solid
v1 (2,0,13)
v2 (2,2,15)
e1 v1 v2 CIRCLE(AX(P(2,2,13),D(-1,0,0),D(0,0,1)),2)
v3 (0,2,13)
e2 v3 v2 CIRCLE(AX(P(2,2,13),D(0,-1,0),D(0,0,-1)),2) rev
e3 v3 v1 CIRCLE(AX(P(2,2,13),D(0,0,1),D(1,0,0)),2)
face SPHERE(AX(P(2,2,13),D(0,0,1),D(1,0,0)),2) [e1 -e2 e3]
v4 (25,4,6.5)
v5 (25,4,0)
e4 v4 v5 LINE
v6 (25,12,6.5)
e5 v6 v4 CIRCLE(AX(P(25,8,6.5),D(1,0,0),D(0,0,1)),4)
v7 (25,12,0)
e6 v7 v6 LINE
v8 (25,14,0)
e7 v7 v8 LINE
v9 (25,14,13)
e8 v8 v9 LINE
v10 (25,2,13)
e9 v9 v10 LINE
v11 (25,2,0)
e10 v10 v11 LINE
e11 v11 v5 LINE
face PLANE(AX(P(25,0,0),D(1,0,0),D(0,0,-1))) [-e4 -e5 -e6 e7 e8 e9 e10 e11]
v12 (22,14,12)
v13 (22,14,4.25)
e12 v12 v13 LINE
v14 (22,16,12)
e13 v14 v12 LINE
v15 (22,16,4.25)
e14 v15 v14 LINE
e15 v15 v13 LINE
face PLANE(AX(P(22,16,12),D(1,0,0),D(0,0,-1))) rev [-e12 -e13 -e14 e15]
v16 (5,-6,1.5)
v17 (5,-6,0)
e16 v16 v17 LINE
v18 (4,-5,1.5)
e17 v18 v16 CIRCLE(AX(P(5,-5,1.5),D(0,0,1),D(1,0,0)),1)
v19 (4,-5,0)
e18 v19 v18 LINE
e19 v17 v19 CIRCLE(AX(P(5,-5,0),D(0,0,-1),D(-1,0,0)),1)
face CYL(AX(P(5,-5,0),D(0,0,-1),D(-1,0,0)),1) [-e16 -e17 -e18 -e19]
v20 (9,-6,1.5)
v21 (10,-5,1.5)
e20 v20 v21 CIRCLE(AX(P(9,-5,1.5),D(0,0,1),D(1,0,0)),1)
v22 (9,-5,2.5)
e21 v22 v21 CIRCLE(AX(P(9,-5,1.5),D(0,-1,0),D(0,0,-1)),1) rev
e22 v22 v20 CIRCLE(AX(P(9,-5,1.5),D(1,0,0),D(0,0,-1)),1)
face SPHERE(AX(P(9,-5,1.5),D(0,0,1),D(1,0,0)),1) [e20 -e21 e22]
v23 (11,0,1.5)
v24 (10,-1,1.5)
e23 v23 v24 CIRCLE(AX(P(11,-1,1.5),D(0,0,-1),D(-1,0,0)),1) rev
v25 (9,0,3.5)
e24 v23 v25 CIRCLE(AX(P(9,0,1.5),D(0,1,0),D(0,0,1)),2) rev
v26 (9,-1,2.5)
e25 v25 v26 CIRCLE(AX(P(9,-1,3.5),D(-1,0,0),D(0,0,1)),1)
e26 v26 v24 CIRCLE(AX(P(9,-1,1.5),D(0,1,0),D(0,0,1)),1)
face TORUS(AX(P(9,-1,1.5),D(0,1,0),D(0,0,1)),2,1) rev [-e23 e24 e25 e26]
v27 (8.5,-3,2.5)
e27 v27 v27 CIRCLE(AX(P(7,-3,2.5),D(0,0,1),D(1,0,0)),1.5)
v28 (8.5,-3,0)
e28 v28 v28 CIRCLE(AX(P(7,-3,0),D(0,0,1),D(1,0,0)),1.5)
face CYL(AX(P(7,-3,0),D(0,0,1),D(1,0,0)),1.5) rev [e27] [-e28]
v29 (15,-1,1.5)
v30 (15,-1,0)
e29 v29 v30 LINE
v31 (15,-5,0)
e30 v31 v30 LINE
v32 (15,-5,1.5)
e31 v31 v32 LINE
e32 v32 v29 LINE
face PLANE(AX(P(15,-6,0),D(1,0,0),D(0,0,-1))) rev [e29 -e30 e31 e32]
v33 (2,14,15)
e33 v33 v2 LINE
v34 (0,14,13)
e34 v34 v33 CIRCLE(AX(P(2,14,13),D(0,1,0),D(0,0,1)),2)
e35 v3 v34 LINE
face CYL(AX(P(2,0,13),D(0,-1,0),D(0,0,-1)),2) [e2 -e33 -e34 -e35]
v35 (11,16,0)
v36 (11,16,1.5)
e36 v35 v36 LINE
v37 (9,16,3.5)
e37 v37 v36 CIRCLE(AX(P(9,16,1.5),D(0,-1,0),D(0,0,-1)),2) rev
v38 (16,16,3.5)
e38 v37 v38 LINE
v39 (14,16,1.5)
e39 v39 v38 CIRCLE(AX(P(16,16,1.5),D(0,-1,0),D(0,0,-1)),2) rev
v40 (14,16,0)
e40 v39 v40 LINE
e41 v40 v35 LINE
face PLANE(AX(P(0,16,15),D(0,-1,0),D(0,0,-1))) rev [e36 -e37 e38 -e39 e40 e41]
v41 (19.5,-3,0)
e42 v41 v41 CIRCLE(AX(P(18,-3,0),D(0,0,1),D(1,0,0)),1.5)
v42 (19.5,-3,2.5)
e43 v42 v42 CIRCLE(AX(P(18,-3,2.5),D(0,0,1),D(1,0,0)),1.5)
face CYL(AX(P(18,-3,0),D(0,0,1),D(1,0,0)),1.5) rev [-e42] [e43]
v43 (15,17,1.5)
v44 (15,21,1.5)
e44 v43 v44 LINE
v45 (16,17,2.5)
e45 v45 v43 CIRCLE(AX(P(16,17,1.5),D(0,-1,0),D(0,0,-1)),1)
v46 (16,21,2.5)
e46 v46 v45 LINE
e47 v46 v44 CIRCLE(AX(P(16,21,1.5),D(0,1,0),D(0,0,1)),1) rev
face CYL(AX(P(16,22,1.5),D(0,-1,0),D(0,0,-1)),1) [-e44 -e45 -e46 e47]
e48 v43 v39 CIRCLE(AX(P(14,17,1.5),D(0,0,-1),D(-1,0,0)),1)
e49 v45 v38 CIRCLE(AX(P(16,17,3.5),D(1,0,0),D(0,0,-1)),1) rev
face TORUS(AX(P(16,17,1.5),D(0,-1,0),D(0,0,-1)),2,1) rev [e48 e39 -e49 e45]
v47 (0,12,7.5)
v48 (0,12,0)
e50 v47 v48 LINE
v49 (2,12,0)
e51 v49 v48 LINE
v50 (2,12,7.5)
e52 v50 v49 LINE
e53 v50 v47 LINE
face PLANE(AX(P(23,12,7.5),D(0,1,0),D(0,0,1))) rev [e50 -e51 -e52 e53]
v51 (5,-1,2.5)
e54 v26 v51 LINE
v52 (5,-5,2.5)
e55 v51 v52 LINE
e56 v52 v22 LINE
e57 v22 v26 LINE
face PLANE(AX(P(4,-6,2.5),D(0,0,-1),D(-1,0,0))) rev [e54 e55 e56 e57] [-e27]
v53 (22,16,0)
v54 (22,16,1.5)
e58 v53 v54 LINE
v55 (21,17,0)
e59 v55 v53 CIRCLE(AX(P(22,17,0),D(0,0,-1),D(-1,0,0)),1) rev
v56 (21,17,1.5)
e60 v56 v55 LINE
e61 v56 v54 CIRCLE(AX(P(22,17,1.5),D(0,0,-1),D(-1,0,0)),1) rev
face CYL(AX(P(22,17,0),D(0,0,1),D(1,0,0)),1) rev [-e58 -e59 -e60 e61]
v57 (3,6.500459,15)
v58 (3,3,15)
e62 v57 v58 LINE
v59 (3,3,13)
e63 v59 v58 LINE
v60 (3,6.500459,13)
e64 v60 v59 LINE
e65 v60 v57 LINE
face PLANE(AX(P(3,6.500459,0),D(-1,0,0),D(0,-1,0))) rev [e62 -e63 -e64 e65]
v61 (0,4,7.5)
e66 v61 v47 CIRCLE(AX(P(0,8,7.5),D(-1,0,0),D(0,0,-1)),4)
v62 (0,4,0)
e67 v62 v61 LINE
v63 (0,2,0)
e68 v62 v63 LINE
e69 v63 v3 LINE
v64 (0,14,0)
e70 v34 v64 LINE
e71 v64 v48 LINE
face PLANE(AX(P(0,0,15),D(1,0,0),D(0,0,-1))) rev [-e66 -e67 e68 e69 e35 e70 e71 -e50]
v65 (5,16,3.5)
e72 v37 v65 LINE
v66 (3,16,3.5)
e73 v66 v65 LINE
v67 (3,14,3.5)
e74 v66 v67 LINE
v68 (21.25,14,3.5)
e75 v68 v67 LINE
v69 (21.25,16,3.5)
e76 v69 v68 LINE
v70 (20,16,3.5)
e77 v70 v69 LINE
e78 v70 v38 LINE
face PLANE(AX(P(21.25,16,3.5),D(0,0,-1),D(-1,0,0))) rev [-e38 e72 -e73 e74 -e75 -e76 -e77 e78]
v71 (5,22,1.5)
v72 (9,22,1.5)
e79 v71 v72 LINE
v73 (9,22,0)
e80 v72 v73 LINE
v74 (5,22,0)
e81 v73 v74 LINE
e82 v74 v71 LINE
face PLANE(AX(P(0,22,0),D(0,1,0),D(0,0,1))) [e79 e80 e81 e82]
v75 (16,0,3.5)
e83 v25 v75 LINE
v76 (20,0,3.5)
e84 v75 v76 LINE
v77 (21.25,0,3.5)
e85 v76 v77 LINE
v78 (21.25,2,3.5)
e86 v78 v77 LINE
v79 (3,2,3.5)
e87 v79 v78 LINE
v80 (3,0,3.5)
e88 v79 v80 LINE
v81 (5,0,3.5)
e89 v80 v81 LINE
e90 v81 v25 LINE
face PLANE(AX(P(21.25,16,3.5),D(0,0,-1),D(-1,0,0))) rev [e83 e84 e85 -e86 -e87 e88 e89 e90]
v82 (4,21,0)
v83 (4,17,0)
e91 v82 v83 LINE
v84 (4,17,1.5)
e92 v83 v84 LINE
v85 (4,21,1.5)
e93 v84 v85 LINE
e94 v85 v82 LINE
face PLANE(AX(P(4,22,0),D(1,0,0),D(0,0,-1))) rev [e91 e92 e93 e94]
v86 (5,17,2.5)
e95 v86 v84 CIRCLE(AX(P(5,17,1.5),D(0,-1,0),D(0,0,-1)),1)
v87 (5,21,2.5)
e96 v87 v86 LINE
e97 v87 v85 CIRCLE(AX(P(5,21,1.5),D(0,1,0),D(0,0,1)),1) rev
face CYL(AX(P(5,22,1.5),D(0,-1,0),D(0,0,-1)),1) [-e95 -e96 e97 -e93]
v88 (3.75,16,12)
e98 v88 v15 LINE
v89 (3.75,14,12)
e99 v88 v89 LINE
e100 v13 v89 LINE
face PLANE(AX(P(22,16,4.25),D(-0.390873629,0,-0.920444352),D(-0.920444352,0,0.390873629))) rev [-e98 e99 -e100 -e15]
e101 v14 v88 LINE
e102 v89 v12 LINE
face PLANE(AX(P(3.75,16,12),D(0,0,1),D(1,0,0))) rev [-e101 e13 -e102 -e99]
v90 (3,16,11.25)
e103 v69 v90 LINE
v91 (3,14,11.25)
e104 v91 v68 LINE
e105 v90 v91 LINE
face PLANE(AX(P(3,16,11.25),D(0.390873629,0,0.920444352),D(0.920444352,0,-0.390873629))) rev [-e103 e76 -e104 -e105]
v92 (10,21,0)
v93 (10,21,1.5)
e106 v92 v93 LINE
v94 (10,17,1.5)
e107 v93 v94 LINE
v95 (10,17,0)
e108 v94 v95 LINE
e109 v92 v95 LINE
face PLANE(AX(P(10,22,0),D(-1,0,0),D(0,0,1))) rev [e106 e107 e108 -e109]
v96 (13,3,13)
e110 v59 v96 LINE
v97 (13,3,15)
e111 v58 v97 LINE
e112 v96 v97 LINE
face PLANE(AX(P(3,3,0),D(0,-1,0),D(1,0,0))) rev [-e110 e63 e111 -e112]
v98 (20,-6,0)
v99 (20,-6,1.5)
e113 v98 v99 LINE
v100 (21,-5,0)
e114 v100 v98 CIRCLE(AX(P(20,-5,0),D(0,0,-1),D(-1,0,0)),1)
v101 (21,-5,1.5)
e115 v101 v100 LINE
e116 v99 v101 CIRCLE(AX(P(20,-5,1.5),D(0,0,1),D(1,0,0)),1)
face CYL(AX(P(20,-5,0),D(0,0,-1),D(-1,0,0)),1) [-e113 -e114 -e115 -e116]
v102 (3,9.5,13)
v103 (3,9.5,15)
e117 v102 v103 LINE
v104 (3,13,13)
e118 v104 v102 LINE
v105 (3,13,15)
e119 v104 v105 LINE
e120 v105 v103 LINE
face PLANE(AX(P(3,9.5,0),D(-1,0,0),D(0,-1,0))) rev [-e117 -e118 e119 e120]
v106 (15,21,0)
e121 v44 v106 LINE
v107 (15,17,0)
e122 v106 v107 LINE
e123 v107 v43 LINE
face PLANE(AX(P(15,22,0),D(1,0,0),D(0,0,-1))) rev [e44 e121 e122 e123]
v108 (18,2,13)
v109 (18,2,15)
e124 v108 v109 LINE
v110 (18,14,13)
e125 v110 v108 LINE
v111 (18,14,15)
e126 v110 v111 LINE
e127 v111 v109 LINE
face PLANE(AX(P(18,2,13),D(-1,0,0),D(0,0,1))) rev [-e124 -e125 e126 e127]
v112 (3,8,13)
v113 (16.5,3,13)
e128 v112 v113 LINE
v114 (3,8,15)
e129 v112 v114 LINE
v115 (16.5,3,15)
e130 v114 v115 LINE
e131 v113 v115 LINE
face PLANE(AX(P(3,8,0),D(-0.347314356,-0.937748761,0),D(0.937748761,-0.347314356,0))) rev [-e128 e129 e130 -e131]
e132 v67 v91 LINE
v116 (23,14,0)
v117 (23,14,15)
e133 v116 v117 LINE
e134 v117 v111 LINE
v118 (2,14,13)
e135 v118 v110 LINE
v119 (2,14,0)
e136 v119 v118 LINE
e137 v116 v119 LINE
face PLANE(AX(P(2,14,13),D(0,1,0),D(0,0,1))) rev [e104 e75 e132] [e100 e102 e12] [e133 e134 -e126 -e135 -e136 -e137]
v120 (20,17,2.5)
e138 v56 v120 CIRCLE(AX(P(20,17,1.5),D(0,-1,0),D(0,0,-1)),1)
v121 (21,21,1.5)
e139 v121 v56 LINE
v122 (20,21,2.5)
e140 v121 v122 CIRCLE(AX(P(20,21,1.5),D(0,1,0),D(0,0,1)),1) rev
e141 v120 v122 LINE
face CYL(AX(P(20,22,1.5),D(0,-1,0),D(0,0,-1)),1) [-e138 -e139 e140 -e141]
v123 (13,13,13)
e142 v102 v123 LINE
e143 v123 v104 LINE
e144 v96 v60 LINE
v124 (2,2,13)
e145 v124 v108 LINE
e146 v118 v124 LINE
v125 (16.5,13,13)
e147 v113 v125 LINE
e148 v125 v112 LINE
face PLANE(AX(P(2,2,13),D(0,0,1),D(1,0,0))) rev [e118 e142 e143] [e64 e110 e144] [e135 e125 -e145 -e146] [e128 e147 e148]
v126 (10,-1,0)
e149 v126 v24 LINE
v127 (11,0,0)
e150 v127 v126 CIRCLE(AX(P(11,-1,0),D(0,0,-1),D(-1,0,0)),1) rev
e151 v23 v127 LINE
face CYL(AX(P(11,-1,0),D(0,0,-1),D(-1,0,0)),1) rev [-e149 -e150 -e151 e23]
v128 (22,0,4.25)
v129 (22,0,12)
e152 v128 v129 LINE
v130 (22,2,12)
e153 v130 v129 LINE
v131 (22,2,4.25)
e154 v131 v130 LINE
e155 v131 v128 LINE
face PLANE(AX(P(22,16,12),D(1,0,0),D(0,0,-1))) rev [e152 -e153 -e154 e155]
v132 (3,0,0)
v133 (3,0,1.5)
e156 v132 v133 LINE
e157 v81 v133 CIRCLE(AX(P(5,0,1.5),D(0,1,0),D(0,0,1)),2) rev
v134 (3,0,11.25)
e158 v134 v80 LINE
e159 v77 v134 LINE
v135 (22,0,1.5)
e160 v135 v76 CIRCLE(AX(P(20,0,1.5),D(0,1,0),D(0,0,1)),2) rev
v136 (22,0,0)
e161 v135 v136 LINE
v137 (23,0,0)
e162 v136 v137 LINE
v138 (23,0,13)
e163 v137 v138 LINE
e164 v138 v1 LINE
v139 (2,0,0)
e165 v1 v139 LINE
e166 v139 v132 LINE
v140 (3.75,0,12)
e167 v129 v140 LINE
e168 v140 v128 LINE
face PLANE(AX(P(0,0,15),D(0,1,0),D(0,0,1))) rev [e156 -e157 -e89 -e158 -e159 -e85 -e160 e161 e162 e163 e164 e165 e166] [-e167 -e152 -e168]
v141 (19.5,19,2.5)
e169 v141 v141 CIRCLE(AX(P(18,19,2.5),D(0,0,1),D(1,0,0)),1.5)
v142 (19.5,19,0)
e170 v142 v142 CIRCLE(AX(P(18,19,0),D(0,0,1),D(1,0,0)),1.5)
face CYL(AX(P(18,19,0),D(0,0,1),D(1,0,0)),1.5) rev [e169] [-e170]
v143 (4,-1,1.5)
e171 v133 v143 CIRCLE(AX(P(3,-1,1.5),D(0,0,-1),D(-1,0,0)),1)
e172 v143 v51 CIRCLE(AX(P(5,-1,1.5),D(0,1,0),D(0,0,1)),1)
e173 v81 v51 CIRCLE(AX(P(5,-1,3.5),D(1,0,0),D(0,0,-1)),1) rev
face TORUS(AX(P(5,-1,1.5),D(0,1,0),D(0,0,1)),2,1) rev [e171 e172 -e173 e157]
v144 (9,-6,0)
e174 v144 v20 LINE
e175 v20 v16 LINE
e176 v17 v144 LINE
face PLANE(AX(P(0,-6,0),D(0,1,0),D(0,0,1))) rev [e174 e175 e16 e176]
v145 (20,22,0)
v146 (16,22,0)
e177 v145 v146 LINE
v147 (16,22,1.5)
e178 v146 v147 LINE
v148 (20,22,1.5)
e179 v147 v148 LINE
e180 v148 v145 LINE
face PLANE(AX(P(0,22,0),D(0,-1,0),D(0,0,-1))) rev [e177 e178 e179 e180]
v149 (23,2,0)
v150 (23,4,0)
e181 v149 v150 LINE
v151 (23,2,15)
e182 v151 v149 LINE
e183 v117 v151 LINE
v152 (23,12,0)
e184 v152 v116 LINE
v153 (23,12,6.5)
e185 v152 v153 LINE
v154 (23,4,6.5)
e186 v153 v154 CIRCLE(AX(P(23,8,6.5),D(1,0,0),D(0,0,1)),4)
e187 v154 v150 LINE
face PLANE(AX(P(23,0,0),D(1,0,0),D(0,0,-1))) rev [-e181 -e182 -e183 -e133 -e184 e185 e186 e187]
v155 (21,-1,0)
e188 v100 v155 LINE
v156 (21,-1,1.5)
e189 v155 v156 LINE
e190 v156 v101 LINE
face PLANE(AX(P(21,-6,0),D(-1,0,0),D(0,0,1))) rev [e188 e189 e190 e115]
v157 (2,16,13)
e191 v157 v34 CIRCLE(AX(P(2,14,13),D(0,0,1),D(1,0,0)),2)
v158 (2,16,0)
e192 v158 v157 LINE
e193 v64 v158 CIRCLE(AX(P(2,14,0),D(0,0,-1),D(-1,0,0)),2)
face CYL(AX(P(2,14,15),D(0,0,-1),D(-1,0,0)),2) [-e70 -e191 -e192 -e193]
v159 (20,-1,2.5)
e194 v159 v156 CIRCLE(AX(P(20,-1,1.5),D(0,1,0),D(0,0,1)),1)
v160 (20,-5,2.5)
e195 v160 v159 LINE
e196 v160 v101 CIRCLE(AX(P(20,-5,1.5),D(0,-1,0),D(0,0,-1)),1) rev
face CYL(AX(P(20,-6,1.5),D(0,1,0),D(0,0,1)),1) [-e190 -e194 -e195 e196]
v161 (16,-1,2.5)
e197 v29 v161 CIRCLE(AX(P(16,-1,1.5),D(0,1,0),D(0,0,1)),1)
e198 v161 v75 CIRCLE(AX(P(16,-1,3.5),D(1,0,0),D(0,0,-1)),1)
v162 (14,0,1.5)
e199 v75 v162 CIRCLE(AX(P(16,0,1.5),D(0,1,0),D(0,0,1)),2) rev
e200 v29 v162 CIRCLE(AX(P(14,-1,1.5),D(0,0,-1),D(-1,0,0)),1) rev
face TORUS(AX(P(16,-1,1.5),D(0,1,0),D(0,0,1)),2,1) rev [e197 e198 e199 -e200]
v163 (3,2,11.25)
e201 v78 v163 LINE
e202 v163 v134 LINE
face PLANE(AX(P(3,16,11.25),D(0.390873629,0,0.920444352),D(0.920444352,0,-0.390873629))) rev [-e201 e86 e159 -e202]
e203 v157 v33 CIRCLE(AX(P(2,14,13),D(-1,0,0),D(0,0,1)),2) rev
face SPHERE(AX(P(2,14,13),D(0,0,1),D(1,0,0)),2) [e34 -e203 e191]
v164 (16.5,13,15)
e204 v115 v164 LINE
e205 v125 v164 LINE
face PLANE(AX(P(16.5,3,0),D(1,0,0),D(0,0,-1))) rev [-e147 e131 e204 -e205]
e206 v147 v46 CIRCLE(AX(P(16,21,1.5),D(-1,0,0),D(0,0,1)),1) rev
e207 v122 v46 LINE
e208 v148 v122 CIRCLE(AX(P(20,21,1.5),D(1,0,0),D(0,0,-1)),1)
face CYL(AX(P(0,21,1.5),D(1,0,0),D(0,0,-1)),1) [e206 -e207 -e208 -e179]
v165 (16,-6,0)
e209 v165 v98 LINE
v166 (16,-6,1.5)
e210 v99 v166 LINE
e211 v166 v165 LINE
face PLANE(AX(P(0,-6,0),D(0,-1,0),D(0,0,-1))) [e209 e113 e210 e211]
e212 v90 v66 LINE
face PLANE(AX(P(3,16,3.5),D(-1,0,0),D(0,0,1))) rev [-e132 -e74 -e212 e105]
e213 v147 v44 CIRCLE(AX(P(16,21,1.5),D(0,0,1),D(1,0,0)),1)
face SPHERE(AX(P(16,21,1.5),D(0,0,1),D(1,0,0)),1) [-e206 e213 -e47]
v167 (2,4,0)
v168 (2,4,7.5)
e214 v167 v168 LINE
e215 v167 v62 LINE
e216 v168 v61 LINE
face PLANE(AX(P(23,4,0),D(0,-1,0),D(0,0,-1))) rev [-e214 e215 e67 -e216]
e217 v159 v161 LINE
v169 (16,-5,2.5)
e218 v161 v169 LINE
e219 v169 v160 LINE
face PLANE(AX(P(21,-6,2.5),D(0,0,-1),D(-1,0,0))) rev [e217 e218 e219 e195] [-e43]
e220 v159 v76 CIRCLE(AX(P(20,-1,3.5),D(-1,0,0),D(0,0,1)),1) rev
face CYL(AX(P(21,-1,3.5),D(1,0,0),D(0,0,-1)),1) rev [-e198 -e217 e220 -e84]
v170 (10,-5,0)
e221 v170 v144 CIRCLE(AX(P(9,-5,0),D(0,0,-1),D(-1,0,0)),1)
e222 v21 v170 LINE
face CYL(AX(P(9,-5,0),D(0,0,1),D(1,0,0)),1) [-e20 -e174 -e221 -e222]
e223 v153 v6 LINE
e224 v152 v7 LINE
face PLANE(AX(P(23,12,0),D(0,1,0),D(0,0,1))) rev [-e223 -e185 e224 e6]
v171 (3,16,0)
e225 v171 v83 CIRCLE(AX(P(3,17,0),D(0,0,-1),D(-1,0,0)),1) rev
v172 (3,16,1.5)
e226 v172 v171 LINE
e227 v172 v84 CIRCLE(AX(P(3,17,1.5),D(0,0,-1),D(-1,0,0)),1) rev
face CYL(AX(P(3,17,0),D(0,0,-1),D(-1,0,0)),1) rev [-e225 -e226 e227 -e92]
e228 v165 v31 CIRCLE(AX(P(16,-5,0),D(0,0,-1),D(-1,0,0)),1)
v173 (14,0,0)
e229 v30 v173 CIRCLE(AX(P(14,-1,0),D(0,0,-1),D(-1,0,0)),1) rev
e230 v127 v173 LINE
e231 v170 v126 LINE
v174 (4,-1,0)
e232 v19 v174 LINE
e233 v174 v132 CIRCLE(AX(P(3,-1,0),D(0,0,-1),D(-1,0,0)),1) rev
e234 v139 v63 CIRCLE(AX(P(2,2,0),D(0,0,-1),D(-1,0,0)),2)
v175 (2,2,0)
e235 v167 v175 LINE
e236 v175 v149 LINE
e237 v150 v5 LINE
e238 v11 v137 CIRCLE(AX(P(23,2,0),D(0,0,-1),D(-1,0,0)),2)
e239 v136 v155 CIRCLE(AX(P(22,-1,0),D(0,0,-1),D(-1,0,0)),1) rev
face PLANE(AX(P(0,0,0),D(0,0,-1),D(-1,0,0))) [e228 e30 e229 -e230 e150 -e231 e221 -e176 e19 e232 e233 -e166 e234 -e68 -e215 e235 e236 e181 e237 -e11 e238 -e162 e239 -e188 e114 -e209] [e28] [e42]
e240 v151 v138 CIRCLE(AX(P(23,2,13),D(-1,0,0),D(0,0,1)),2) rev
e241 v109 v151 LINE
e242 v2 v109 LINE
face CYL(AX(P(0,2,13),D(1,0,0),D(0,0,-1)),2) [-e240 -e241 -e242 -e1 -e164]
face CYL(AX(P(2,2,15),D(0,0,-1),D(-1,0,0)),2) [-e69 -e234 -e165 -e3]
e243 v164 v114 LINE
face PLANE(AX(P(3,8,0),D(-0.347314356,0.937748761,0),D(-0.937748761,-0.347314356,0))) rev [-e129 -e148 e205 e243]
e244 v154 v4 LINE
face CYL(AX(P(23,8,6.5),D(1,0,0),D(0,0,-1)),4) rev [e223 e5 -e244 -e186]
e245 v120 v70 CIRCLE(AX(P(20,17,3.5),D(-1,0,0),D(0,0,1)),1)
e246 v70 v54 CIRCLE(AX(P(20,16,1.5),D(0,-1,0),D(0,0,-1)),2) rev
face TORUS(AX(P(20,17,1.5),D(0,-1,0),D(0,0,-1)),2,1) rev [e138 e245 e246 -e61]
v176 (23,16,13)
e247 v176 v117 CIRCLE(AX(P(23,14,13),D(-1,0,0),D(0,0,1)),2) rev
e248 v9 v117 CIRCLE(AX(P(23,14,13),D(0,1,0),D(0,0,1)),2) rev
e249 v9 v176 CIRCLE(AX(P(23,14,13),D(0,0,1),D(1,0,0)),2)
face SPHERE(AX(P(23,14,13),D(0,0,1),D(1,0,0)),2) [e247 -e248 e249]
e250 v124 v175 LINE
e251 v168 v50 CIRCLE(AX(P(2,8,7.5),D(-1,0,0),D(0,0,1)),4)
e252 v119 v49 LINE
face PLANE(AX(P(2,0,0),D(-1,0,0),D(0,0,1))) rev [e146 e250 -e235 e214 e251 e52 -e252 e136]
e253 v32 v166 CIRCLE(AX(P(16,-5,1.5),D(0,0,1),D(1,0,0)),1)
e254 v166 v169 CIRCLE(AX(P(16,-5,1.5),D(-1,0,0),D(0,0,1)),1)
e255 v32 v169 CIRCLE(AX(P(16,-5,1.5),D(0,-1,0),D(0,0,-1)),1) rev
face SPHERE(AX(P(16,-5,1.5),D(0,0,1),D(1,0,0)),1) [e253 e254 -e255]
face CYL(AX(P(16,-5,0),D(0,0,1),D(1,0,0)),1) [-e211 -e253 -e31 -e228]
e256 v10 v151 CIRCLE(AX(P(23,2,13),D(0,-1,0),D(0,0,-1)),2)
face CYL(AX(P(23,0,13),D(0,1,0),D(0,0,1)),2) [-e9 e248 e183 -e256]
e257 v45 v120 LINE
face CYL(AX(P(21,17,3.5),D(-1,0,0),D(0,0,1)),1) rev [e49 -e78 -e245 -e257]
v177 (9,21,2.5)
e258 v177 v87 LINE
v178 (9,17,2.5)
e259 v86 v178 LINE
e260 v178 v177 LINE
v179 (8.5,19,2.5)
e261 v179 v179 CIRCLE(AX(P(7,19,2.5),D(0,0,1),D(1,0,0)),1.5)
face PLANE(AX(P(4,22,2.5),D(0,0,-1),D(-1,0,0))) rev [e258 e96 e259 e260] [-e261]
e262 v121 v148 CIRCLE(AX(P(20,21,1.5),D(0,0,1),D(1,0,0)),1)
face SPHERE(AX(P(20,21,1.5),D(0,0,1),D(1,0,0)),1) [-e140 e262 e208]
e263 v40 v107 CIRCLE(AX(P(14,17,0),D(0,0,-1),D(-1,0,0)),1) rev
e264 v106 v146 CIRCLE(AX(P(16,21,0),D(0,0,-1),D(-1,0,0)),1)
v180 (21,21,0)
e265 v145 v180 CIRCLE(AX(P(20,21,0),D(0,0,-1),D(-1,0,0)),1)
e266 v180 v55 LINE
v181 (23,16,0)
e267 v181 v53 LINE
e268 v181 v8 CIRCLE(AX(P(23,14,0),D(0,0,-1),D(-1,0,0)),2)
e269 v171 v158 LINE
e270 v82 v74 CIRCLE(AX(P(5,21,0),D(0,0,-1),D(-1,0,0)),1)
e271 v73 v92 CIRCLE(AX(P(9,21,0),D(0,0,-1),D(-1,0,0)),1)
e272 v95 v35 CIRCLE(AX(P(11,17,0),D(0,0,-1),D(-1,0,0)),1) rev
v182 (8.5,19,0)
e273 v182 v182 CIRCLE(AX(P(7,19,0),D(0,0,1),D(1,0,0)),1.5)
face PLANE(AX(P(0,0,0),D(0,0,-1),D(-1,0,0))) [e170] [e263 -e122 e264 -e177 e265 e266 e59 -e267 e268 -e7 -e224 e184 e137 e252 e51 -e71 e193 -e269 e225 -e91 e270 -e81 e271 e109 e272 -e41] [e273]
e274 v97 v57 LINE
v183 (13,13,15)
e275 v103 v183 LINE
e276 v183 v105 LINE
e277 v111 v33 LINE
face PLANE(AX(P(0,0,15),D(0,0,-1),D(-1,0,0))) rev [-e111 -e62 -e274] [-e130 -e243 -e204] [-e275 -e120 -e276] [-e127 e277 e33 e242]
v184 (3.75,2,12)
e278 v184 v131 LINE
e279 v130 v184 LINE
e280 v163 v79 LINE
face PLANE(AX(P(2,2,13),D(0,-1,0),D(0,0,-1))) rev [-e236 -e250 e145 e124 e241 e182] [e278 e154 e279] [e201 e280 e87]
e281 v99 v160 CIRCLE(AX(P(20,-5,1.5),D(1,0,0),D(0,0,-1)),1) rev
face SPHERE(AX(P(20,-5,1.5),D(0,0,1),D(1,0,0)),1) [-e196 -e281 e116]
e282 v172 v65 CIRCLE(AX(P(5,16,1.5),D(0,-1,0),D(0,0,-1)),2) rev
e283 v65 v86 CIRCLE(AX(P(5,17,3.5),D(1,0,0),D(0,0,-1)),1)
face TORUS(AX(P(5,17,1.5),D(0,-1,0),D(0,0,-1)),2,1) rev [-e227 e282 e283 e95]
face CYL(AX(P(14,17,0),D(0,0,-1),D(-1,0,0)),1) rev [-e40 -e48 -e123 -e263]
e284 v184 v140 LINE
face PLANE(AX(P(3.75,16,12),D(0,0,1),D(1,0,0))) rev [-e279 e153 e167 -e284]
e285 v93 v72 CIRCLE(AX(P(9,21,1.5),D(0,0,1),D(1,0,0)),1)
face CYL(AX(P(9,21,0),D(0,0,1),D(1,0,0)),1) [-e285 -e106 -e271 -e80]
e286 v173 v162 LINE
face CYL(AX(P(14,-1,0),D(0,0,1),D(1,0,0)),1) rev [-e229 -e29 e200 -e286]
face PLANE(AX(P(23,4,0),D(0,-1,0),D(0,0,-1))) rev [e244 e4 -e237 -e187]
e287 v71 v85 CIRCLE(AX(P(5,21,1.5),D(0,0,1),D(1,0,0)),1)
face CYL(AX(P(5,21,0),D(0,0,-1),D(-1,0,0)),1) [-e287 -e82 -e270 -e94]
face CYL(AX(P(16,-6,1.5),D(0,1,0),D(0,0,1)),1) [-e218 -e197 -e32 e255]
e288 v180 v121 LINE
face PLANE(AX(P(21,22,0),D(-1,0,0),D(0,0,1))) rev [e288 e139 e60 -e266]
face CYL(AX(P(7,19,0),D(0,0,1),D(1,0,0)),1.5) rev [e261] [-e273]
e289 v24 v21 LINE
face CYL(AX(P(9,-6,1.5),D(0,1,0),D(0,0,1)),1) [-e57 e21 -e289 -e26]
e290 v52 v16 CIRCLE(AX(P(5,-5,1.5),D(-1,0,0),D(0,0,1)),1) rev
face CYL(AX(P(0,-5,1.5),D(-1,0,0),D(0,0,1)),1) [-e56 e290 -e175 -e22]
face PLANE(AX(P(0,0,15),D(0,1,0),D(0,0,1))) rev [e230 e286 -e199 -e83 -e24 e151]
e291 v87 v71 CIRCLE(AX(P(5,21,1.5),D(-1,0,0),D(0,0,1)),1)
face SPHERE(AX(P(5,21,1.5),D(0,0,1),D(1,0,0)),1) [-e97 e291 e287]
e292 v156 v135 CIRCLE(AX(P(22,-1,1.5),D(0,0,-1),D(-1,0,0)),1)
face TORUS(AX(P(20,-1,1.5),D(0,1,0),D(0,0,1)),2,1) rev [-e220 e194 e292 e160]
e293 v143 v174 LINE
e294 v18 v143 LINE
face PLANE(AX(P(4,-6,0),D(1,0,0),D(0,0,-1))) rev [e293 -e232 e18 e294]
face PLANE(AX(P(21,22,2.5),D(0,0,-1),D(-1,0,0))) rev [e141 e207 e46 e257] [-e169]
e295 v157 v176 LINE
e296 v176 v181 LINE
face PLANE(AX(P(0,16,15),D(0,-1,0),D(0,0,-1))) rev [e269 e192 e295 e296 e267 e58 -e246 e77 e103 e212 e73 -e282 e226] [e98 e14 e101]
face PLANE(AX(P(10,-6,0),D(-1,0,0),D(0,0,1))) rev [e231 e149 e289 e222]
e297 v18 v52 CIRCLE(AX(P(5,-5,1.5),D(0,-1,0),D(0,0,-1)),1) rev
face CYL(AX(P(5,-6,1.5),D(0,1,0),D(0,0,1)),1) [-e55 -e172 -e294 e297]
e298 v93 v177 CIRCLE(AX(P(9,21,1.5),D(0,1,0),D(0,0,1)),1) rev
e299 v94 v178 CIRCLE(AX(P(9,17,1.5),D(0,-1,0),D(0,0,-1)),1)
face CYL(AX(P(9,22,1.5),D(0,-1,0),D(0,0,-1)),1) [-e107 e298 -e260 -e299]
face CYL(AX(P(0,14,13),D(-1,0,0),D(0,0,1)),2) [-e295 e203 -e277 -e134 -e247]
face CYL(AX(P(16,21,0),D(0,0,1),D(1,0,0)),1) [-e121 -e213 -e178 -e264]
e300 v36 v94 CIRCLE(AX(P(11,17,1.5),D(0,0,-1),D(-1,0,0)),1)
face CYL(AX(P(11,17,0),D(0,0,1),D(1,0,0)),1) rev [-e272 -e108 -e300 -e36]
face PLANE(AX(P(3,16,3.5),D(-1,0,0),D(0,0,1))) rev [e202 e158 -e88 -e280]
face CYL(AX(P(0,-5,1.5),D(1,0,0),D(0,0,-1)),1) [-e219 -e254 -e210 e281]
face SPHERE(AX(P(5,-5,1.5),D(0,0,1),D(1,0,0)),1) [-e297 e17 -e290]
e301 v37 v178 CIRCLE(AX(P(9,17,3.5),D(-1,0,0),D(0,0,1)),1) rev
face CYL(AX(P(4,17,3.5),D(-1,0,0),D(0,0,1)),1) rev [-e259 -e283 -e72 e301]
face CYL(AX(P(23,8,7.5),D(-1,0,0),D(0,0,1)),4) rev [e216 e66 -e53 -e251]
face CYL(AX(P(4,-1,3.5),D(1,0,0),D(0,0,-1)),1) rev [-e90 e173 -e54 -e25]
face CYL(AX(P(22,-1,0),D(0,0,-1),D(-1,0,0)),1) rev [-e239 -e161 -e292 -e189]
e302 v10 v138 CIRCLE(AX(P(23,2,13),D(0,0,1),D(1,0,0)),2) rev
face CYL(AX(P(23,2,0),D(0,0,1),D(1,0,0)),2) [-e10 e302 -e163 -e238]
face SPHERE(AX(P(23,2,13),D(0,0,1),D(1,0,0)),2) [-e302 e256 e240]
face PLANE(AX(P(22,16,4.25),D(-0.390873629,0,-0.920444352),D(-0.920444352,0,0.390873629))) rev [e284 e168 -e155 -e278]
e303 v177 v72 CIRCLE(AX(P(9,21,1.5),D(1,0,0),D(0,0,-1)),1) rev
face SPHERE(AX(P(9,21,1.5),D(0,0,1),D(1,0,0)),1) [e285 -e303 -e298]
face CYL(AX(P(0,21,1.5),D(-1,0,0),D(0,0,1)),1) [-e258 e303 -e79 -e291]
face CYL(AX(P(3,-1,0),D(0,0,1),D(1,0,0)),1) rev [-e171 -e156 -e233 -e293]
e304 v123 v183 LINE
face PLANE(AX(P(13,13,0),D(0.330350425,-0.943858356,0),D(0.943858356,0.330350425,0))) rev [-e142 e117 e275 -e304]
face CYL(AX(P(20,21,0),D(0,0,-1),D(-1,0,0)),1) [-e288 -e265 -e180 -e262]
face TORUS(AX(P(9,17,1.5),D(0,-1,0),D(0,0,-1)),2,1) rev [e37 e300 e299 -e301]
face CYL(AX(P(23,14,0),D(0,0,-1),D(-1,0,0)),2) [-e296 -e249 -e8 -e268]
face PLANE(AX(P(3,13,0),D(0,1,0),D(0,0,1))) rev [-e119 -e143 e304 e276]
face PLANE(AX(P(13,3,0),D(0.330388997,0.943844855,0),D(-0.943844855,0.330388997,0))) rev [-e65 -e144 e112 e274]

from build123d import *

# Parameters (mm, degrees)
CROQUIS1_W              = 23
CROQUIS1_H              = 16
SALIENTE_EXTRUIR1_DEPTH = 15
CROQUIS2_W              = 11
CROQUIS2_H              = 12
CORTAR_EXTRUIR1_DEPTH   = 21
CORTAR_EXTRUIR2_DEPTH   = 23
CROQUIS5_W              = 5
CROQUIS5_H              = 12
CORTAR_EXTRUIR3_DEPTH   = 2
REDONDEO1_R             = 2
CORTAR_EXTRUIR4_DEPTH   = 32.780497164
CROQUIS18_W             = 21
CROQUIS18_H             = 12
CORTAR_EXTRUIR8_DEPTH   = 31.886890423
CROQUIS17_W             = 15
CROQUIS17_H             = 16
SALIENTE_EXTRUIR7_DEPTH = 2
REDONDEO8_R             = 2
CROQUIS19_W             = 6
CROQUIS19_H             = 2.5
SALIENTE_EXTRUIR8_DEPTH = 6
CROQUIS20_W             = 6
CROQUIS20_H             = 2.5
SALIENTE_EXTRUIR9_DEPTH = 6
CROQUIS21_R             = 1.5
CORTAR_EXTRUIR9_DEPTH   = 36.570352824
REDONDEO9_R             = 1
CORTAR_EXTRUIR10_DEPTH  = 16
CORTAR_EXTRUIR11_DEPTH  = 2


with BuildPart() as part:
    # Croquis1 → Saliente-Extruir1 (new body)
    with BuildSketch(Plane.XY):
        with Locations((11.5, 8)):
            Rectangle(CROQUIS1_W, CROQUIS1_H)
    extrude(amount=SALIENTE_EXTRUIR1_DEPTH)

    # Croquis2 → Cortar-Extruir1 (cut)
    with BuildSketch(Plane(origin=(23, 0, 0), x_dir=(0, 0, -1), z_dir=(1, 0, 0))):
        with Locations((-7.5, 8)):
            Rectangle(CROQUIS2_W, CROQUIS2_H)
    extrude(amount=-CORTAR_EXTRUIR1_DEPTH, mode=Mode.SUBTRACT)

    # Croquis4 → Cortar-Extruir2 (cut)
    with BuildSketch(Plane.ZY):
        with BuildLine():
            Line((7.5, 12), (0, 12))
            Line((0, 12), (0, 4))
            Line((0, 4), (7.5, 4))
            ThreePointArc((7.5, 4), (11.5, 8), (7.5, 12))
        make_face()
    extrude(amount=-CORTAR_EXTRUIR2_DEPTH, mode=Mode.SUBTRACT)

    # Croquis5 → Cortar-Extruir3 (cut)
    with BuildSketch(Plane.XY.offset(15)):
        with Locations((20.5, 8)):
            Rectangle(CROQUIS5_W, CROQUIS5_H)
    extrude(amount=-CORTAR_EXTRUIR3_DEPTH, mode=Mode.SUBTRACT)

    # Redondeo1
    redondeo1_edges = [part.edges().sort_by_distance(p)[0] for p in [
        (11.5, 16, 15),
        (11.5, 0, 15),
        (0, 16, 7.5),
        (0, 8, 15),
        (0, 0, 7.5),
    ]]
    fillet(redondeo1_edges, radius=REDONDEO1_R)

    # Croquis8 → Cortar-Extruir4 (cut, through all)
    with BuildSketch(Plane.XY.offset(15)):
        Polygon((16.5, 3), (16.5, 13), (3, 8), align=None)
        Polygon((3, 6.500458737), (3, 3), (13, 3), align=None)
        Polygon((3, 9.5), (3, 13), (13, 13), align=None)
    extrude(amount=-CORTAR_EXTRUIR4_DEPTH, mode=Mode.SUBTRACT)

    # Croquis18 → Cortar-Extruir8 (cut, through all)
    with BuildSketch(Plane.XY.offset(2)):
        with Locations((12.5, 8)):
            Rectangle(CROQUIS18_W, CROQUIS18_H)
    extrude(amount=-CORTAR_EXTRUIR8_DEPTH, mode=Mode.SUBTRACT)

    # Croquis17 → Saliente-Extruir7 (add)
    with BuildSketch(Plane(origin=(23, 0, 0), x_dir=(0, 0, -1), z_dir=(1, 0, 0))):
        with Locations((-7.5, 8)):
            Rectangle(CROQUIS17_W, CROQUIS17_H)
    extrude(amount=SALIENTE_EXTRUIR7_DEPTH)

    # Redondeo8
    # the kernel refuses this fillet: 2 mm, written as the material it takes off along each edge
    with BuildSketch(Plane(origin=(23, 14, 13), x_dir=(1, 0, 0), z_dir=(0, 1, 0))) as redondeo8_piece_1_section:
        Polygon((0, 0), (REDONDEO8_R * 1.02, 0), (REDONDEO8_R * 1.02, -REDONDEO8_R * 1.02), (0, -REDONDEO8_R * 1.02), align=None)
    redondeo8_piece_1 = extrude(amount=REDONDEO8_R * 1.02, mode=Mode.PRIVATE)
    redondeo8_piece_1 = redondeo8_piece_1 - Plane(origin=(23, 14, 13), x_dir=(-0.7071067811865475, 0, -0.7071067811865475), z_dir=(0, 1, 0)) * Sphere(REDONDEO8_R, mode=Mode.PRIVATE)
    add(redondeo8_piece_1, mode=Mode.SUBTRACT)
    with BuildSketch(Plane(origin=(23, 2, 13), x_dir=(1, 0, 0), z_dir=(0, -1, 0))) as redondeo8_piece_2_section:
        Polygon((0, 0), (REDONDEO8_R * 1.02, 0), (REDONDEO8_R * 1.02, REDONDEO8_R * 1.02), (0, REDONDEO8_R * 1.02), align=None)
    redondeo8_piece_2 = extrude(amount=REDONDEO8_R * 1.02, mode=Mode.PRIVATE)
    redondeo8_piece_2 = redondeo8_piece_2 - Plane(origin=(23, 2, 13), x_dir=(-0.7071067811865475, 0, -0.7071067811865475), z_dir=(0, -1, 0)) * Sphere(REDONDEO8_R, mode=Mode.PRIVATE)
    add(redondeo8_piece_2, mode=Mode.SUBTRACT)
    with BuildSketch(Plane(origin=(23, 14, 15), x_dir=(0, 0, -1), z_dir=(0, 1, 0))) as redondeo8_piece_3_section:
        with BuildLine():
            CenterArc((REDONDEO8_R, -REDONDEO8_R), REDONDEO8_R, 90, 90)
            Line((0, -REDONDEO8_R), (0, 0))
            Line((0, 0), (REDONDEO8_R, 0))
        make_face()
    redondeo8_piece_3 = extrude(amount=7, mode=Mode.PRIVATE)
    redondeo8_piece_3 = redondeo8_piece_3 - Plane(origin=(23.57115566, 14, 13), x_dir=(0, 0, 1), z_dir=(-1, 0, 0)) * Cylinder(2, 23, mode=Mode.PRIVATE)
    add(redondeo8_piece_3, mode=Mode.SUBTRACT)
    with BuildSketch(Plane(origin=(23, -5, 15), x_dir=(1, 0, 0), z_dir=(0, 1, 0))) as redondeo8_piece_4_section:
        with BuildLine():
            CenterArc((REDONDEO8_R, REDONDEO8_R), REDONDEO8_R, 180, 90)
            Line((0, REDONDEO8_R), (0, 0))
            Line((0, 0), (REDONDEO8_R, 0))
        make_face()
    redondeo8_piece_4 = extrude(amount=7, mode=Mode.PRIVATE)
    redondeo8_piece_4 = redondeo8_piece_4 - Plane(origin=(23.571155663, 2, 13), x_dir=(0, -1, 0), z_dir=(1, 0, 0)) * Cylinder(2, 22, mode=Mode.PRIVATE)
    add(redondeo8_piece_4, mode=Mode.SUBTRACT)
    with BuildSketch(Plane(origin=(25, 16, 13), x_dir=(-1, 0, 0), z_dir=(0, 0, -1)), Plane(origin=(25, 0, -5), x_dir=(-1, 0, 0), z_dir=(0, 0, 1))) as redondeo8_piece_5:
        with BuildLine():
            CenterArc((REDONDEO8_R, -REDONDEO8_R), REDONDEO8_R, 90, 90)
            Line((0, -REDONDEO8_R), (0, 0))
            Line((0, 0), (REDONDEO8_R, 0))
        make_face()
    extrude(amount=18, mode=Mode.SUBTRACT)
    with BuildSketch(Plane(origin=(25, 2, 15), x_dir=(0, 0, -1), z_dir=(0, 1, 0))) as redondeo8_piece_6:
        with BuildLine():
            CenterArc((REDONDEO8_R, REDONDEO8_R), REDONDEO8_R, 180, 90)
            Line((0, REDONDEO8_R), (0, 0))
            Line((0, 0), (REDONDEO8_R, 0))
        make_face()
    extrude(amount=12, mode=Mode.SUBTRACT)

    # Croquis19 → Saliente-Extruir8 (add)
    with BuildSketch(Plane(origin=(0, 16, 0), x_dir=(1, 0, 0), z_dir=(0, 1, 0))):
        with Locations((18, -1.25)):
            Rectangle(CROQUIS19_W, CROQUIS19_H)
        with Locations((7, -1.25)):
            Rectangle(CROQUIS19_W, CROQUIS19_H)
    extrude(amount=SALIENTE_EXTRUIR8_DEPTH)

    # Croquis20 → Saliente-Extruir9 (add)
    with BuildSketch(Plane.XZ):
        with Locations((7, 1.25)):
            Rectangle(CROQUIS20_W, CROQUIS20_H)
        with Locations((18, 1.25)):
            Rectangle(CROQUIS20_W, CROQUIS20_H)
    extrude(amount=SALIENTE_EXTRUIR9_DEPTH)

    # Croquis21 → Cortar-Extruir9 (cut, through all)
    with BuildSketch(Plane.XY.offset(2.5)):
        with Locations((18, 19)):
            Circle(CROQUIS21_R)
        with Locations((7, 19)):
            Circle(CROQUIS21_R)
        with Locations((7, -3)):
            Circle(CROQUIS21_R)
        with Locations((18, -3)):
            Circle(CROQUIS21_R)
    extrude(amount=-CORTAR_EXTRUIR9_DEPTH, mode=Mode.SUBTRACT)

    # Redondeo9
    redondeo9_edges = [part.edges().sort_by_distance(p)[0] for p in [
        (21, 16, 1.25),
        (21, 19, 2.5),
        (15, 16, 1.25),
        (18, 16, 2.5),
        (15, 19, 2.5),
        (21, 22, 1.25),
        (15, 22, 1.25),
        (18, 22, 2.5),
        (4, 16, 1.25),
        (7, 16, 2.5),
        (4, 19, 2.5),
        (10, 16, 1.25),
        (10, 19, 2.5),
        (4, 22, 1.25),
        (7, 22, 2.5),
        (10, 22, 1.25),
        (4, 0, 1.25),
        (4, -3, 2.5),
        (10, 0, 1.25),
        (7, 0, 2.5),
        (10, -3, 2.5),
        (4, -6, 1.25),
        (10, -6, 1.25),
        (7, -6, 2.5),
        (21, 0, 1.25),
        (18, 0, 2.5),
        (21, -3, 2.5),
        (15, 0, 1.25),
        (15, -3, 2.5),
        (21, -6, 1.25),
        (18, -6, 2.5),
        (15, -6, 1.25),
    ]]
    fillet(redondeo9_edges, radius=REDONDEO9_R)

    # Croquis22 → Cortar-Extruir10 (cut)
    with BuildSketch(Plane.XZ):
        Polygon((3, 11.25), (21.25, 3.5), (3, 3.5), align=None)
        Polygon((22, 4.25), (3.75, 12), (22, 12), align=None)
    extrude(amount=-CORTAR_EXTRUIR10_DEPTH, mode=Mode.SUBTRACT)

    # Croquis23 → Cortar-Extruir11 (cut)
    with BuildSketch(Plane(origin=(25, 0, 0), x_dir=(0, 0, -1), z_dir=(1, 0, 0))):
        with BuildLine():
            Line((0, 4), (0, 12))
            Line((0, 12), (-6.5, 12))
            ThreePointArc((-6.5, 12), (-10.5, 8), (-6.5, 4))
            Line((-6.5, 4), (0, 4))
        make_face()
    extrude(amount=-CORTAR_EXTRUIR11_DEPTH, mode=Mode.SUBTRACT)


solid = part.part
